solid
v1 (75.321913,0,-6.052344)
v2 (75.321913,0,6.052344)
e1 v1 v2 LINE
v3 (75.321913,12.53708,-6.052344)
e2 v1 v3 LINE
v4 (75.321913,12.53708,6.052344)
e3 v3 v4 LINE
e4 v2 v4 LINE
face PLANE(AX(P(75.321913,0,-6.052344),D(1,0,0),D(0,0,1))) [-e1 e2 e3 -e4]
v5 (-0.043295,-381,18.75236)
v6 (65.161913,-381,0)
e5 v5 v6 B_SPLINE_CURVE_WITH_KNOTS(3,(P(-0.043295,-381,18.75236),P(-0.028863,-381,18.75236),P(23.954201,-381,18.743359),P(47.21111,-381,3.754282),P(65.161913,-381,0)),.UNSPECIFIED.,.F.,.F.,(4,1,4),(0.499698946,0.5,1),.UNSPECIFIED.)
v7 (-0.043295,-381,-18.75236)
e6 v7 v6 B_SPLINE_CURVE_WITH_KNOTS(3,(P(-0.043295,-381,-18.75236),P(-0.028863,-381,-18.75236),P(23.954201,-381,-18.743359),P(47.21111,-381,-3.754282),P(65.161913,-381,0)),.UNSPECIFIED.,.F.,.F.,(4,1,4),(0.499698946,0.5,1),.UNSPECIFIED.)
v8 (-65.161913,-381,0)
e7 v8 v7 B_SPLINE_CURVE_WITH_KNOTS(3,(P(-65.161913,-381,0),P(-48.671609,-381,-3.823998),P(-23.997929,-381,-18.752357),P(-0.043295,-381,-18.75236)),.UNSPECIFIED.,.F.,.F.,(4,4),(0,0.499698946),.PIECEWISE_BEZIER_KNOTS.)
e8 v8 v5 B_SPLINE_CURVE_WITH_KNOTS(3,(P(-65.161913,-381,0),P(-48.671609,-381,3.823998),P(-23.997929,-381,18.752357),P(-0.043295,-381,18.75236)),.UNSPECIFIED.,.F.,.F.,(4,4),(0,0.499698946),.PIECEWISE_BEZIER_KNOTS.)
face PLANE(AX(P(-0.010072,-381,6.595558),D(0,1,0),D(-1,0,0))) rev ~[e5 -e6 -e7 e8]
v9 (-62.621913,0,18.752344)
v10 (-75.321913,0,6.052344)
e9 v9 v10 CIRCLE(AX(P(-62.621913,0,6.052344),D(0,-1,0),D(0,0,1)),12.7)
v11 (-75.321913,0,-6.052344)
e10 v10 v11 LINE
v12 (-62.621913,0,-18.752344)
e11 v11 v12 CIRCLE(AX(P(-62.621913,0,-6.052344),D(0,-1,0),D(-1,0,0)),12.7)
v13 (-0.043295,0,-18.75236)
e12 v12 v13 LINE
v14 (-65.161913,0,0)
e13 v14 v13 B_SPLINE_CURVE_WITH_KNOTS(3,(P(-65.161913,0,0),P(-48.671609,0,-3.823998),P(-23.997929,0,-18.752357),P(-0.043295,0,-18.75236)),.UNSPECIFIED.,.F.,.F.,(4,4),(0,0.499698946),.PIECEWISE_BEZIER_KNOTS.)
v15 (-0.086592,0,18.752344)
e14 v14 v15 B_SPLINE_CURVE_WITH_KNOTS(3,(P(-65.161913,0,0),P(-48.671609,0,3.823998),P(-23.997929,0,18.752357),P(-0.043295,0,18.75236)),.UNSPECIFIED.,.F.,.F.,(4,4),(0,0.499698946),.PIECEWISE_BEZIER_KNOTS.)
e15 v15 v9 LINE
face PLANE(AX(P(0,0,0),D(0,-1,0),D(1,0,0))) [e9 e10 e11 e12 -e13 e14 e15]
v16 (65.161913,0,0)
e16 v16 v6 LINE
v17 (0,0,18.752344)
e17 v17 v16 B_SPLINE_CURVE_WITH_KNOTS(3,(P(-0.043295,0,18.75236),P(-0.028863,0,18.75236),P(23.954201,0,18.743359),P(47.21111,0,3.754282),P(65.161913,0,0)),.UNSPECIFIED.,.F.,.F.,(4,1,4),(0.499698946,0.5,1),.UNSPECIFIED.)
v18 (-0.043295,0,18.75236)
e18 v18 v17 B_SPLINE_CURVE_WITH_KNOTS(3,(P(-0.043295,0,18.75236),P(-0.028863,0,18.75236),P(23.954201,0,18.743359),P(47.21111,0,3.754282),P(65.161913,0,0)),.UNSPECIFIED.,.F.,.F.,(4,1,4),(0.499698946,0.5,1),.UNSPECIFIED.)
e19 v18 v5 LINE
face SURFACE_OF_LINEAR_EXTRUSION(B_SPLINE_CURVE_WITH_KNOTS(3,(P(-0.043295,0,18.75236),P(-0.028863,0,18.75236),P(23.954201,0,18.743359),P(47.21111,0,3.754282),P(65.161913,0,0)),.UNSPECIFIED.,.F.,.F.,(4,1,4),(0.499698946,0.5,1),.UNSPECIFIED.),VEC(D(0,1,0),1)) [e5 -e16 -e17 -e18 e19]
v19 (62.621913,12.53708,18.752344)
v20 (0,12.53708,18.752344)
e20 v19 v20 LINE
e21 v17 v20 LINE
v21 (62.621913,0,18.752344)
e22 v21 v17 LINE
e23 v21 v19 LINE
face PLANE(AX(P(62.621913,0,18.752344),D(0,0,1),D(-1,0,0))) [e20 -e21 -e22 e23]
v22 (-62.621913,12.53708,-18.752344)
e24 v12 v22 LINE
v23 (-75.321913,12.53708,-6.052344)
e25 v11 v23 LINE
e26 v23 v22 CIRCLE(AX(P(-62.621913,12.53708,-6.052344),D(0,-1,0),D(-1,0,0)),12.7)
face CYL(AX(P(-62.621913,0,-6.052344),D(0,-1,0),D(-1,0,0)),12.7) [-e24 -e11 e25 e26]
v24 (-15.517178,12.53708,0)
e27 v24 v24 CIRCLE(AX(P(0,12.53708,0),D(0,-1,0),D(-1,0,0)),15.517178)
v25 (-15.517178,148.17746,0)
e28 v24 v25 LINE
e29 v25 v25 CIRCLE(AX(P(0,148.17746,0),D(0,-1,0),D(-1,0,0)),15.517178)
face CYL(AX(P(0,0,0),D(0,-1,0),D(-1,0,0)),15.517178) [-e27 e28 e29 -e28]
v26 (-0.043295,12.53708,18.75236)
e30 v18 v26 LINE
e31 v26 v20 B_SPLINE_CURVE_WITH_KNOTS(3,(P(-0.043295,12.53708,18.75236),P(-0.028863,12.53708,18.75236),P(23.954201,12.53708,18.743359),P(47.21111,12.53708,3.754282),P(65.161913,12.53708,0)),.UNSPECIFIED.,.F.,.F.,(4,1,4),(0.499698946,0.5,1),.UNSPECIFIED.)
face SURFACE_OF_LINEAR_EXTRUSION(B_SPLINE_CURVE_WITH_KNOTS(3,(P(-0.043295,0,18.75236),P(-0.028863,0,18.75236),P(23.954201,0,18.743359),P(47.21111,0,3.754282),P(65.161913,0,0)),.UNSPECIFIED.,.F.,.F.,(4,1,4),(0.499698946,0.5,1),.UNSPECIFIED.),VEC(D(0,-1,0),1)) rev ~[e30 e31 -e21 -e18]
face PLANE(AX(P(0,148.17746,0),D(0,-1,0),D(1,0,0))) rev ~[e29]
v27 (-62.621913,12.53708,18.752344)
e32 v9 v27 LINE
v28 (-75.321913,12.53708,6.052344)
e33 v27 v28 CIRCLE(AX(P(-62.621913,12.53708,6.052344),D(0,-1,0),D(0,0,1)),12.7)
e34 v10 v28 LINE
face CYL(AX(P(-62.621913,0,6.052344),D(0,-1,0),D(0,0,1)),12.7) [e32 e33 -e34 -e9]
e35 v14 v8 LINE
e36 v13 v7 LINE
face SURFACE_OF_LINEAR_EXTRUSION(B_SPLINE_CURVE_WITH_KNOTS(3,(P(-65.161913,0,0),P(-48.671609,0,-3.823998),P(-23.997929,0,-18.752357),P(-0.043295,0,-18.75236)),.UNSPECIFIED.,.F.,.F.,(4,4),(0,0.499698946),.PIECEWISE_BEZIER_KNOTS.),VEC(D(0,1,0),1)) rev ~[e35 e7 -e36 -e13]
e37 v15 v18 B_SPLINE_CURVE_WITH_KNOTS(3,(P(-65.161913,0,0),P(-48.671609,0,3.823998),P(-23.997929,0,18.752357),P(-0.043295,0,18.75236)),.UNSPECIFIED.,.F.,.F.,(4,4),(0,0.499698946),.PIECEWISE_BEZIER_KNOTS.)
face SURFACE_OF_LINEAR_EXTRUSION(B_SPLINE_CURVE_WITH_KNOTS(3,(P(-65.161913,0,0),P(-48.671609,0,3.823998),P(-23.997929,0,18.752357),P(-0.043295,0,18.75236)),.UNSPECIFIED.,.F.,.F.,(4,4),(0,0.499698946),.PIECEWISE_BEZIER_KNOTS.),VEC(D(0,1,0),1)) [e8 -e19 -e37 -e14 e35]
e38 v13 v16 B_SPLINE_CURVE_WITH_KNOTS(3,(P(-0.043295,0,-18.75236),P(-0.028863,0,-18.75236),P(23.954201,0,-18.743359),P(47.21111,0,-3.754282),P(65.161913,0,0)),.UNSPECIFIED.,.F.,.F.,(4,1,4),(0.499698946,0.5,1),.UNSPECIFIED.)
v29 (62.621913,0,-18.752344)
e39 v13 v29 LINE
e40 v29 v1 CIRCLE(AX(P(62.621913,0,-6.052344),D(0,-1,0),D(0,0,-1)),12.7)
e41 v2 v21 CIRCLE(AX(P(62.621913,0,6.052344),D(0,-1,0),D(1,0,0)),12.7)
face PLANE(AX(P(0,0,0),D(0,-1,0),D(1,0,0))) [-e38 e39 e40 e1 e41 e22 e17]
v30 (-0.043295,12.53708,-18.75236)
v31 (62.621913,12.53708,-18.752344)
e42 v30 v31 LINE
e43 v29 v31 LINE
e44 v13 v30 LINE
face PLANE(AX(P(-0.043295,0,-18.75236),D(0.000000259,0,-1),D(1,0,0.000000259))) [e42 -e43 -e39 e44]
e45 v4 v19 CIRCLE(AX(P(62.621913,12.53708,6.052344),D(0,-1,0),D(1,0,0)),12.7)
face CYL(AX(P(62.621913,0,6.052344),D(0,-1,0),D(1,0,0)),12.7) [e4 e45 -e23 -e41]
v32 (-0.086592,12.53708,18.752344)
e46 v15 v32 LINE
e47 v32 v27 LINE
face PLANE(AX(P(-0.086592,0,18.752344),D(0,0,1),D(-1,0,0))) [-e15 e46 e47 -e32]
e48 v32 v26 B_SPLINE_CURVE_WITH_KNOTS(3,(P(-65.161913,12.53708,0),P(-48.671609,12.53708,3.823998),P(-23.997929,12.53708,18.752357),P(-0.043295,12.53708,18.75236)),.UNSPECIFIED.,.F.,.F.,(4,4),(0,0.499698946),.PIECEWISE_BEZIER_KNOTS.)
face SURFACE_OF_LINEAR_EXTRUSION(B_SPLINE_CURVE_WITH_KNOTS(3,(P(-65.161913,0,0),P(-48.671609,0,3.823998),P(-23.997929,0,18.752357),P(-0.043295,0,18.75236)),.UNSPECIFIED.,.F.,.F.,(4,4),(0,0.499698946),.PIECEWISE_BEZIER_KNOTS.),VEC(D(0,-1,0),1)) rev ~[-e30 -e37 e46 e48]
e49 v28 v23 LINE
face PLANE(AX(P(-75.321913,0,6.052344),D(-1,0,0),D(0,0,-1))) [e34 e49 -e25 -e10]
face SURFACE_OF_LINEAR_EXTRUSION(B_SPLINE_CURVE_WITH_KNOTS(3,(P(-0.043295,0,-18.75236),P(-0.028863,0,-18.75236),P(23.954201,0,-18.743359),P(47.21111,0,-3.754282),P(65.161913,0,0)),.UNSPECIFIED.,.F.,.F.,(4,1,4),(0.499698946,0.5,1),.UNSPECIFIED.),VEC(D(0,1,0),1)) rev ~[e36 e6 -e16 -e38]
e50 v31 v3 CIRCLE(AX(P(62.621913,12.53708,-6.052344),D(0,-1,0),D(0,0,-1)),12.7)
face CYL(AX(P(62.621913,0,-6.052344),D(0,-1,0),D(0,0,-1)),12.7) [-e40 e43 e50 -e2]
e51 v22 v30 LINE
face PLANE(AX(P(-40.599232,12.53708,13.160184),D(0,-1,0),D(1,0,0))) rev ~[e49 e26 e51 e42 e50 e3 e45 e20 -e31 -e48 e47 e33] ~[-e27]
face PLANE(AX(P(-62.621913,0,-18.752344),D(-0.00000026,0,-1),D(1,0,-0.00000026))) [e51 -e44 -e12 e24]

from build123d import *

# Parameters (mm, degrees)
F1_DEPTH = 12.53708
F2_DEPTH = 148.17746
F3_DEPTH = 381


# Not quite as in the source:
# - ends of sketch curves that miss each other by under 0.0002 mm in the source are joined
# - a feature names something its author has since deleted; it is built from what else it names


with BuildPart() as f1:
    # F0 (on Front) → F1 (new body)
    with BuildSketch(Plane.XZ):
        with BuildLine():
            Line((-0.0432951165, 18.7523439527), (-62.6219127655, 18.7523439527))
            ThreePointArc((-62.6219127655, 18.7523439527), (-71.6021688866, 15.0326000737), (-75.3219127655, 6.0523439527))
            Line((-75.3219127655, 6.0523439527), (-75.3219127655, 0))
            Line((-75.3219127655, 0), (-65.1619127655, 0))
            add(Edge.make_bspline(
                [(-65.1619127655, 0), (-48.671609143, 3.823998258), (-23.9979293543, 18.7523570586), (-0.0432951165, 18.7523439527)],
                knots=[0, 0, 0, 0, 0.499698946, 0.499698946, 0.499698946, 0.499698946], degree=3))
        make_face()
        with BuildLine():
            add(Edge.make_bspline(
                [(-0.0432951165, 18.7523602083), (-0.0288631494, 18.7523602102), (23.9542012968, 18.7433586286), (47.2111099504, 3.7542823594), (65.1619127655, 0)],
                knots=[0.499698946, 0.499698946, 0.499698946, 0.499698946, 0.5, 1, 1, 1, 1], degree=3))
            add(Edge.make_bspline(
                [(-65.1619127655, 0), (-48.671609143, 3.823998258), (-23.9979293543, 18.7523570586), (-0.0432951165, 18.7523602083)],
                knots=[0, 0, 0, 0, 0.499698946, 0.499698946, 0.499698946, 0.499698946], degree=3))
            Line((-65.1619127655, 0), (-15.5171778125, 0))
            ThreePointArc((-15.5171778125, 0), (0, 15.5171778125), (15.5171778125, 0))
            Line((15.5171778125, 0), (65.1619127655, 0))
        make_face()
        with BuildLine():
            Line((62.6219127655, 18.7523439527), (-0.0432951165, 18.7523439527))
            add(Edge.make_bspline(
                [(-0.0432951165, 18.7523439527), (-0.0288631494, 18.7523602102), (23.9542012968, 18.7433586286), (47.2111099504, 3.7542823594), (65.1619127655, 0)],
                knots=[0.499698946, 0.499698946, 0.499698946, 0.499698946, 0.5, 1, 1, 1, 1], degree=3))
            Line((65.1619127655, 0), (75.3219127655, 0))
            Line((75.3219127655, 0), (75.3219127655, 6.0523439527))
            ThreePointArc((75.3219127655, 6.0523439527), (71.6021688866, 15.0326000737), (62.6219127655, 18.7523439527))
        make_face()
        with BuildLine():
            add(Edge.make_bspline(
                [(-65.1619127655, 0), (-48.671609143, -3.823998258), (-23.9979293543, -18.7523570586), (-0.0432951165, -18.7523602083)],
                knots=[0, 0, 0, 0, 0.499698946, 0.499698946, 0.499698946, 0.499698946], degree=3))
            Line((-65.1619127655, 0), (-75.3219127655, 0))
            Line((-75.3219127655, 0), (-75.3219127655, -6.0523439527))
            ThreePointArc((-75.3219127655, -6.0523439527), (-71.6021688866, -15.0326000737), (-62.6219127655, -18.7523439527))
            Line((-62.6219127655, -18.7523439527), (-0.0432951165, -18.7523602083))
        make_face()
        with BuildLine():
            Line((-15.5171778125, 0), (-65.1619127655, 0))
            add(Edge.make_bspline(
                [(-65.1619127655, 0), (-48.671609143, -3.823998258), (-23.9979293543, -18.7523570586), (-0.0432951165, -18.7523602083)],
                knots=[0, 0, 0, 0, 0.499698946, 0.499698946, 0.499698946, 0.499698946], degree=3))
            add(Edge.make_bspline(
                [(-0.0432951165, -18.7523602083), (-0.0288631494, -18.7523602102), (23.9542012968, -18.7433586286), (47.2111099504, -3.7542823594), (65.1619127655, 0)],
                knots=[0.499698946, 0.499698946, 0.499698946, 0.499698946, 0.5, 1, 1, 1, 1], degree=3))
            Line((65.1619127655, 0), (15.5171778125, 0))
            ThreePointArc((15.5171778125, 0), (0, -15.5171778125), (-15.5171778125, 0))
        make_face()
        with BuildLine():
            Line((75.3219127655, 0), (65.1619127655, 0))
            add(Edge.make_bspline(
                [(-0.0432951165, -18.7523602083), (-0.0288631494, -18.7523602102), (23.9542012968, -18.7433586286), (47.2111099504, -3.7542823594), (65.1619127655, 0)],
                knots=[0.499698946, 0.499698946, 0.499698946, 0.499698946, 0.5, 1, 1, 1, 1], degree=3))
            Line((-0.0432951165, -18.7523602083), (62.6219127655, -18.7523439527))
            ThreePointArc((62.6219127655, -18.7523439527), (71.6021688866, -15.0326000737), (75.3219127655, -6.0523439527))
            Line((75.3219127655, -6.0523439527), (75.3219127655, 0))
        make_face()
        with BuildLine():
            ThreePointArc((15.5171778125, 0), (0, 15.5171778125), (-15.5171778125, 0))
            ThreePointArc((-15.5171778125, 0), (0, -15.5171778125), (15.5171778125, 0))
        make_face()
    extrude(amount=-F1_DEPTH)

    # F0 (on Front) → F2 (join)
    with BuildSketch(Plane.XZ):
        with BuildLine():
            ThreePointArc((15.5171778125, 0), (0, 15.5171778125), (-15.5171778125, 0))
            ThreePointArc((-15.5171778125, 0), (0, -15.5171778125), (15.5171778125, 0))
        make_face()
    extrude(amount=-F2_DEPTH)

    # F0 (on Front) → F3 (join)
    with BuildSketch(Plane.XZ):
        with BuildLine():
            add(Edge.make_bspline(
                [(-0.0432951165, 18.7523602083), (-0.0288631494, 18.7523602102), (23.9542012968, 18.7433586286), (47.2111099504, 3.7542823594), (65.1619127655, 0)],
                knots=[0.499698946, 0.499698946, 0.499698946, 0.499698946, 0.5, 1, 1, 1, 1], degree=3))
            add(Edge.make_bspline(
                [(-65.1619127655, 0), (-48.671609143, 3.823998258), (-23.9979293543, 18.7523570586), (-0.0432951165, 18.7523602083)],
                knots=[0, 0, 0, 0, 0.499698946, 0.499698946, 0.499698946, 0.499698946], degree=3))
            Line((-65.1619127655, 0), (-15.5171778125, 0))
            ThreePointArc((-15.5171778125, 0), (0, 15.5171778125), (15.5171778125, 0))
            Line((15.5171778125, 0), (65.1619127655, 0))
        make_face()
        with BuildLine():
            Line((-15.5171778125, 0), (-65.1619127655, 0))
            add(Edge.make_bspline(
                [(-65.1619127655, 0), (-48.671609143, -3.823998258), (-23.9979293543, -18.7523570586), (-0.0432951165, -18.7523602083)],
                knots=[0, 0, 0, 0, 0.499698946, 0.499698946, 0.499698946, 0.499698946], degree=3))
            add(Edge.make_bspline(
                [(-0.0432951165, -18.7523602083), (-0.0288631494, -18.7523602102), (23.9542012968, -18.7433586286), (47.2111099504, -3.7542823594), (65.1619127655, 0)],
                knots=[0.499698946, 0.499698946, 0.499698946, 0.499698946, 0.5, 1, 1, 1, 1], degree=3))
            Line((65.1619127655, 0), (15.5171778125, 0))
            ThreePointArc((15.5171778125, 0), (0, -15.5171778125), (-15.5171778125, 0))
        make_face()
        with BuildLine():
            ThreePointArc((15.5171778125, 0), (0, 15.5171778125), (-15.5171778125, 0))
            ThreePointArc((-15.5171778125, 0), (0, -15.5171778125), (15.5171778125, 0))
        make_face()
    extrude(amount=F3_DEPTH)


solid = f1.part
